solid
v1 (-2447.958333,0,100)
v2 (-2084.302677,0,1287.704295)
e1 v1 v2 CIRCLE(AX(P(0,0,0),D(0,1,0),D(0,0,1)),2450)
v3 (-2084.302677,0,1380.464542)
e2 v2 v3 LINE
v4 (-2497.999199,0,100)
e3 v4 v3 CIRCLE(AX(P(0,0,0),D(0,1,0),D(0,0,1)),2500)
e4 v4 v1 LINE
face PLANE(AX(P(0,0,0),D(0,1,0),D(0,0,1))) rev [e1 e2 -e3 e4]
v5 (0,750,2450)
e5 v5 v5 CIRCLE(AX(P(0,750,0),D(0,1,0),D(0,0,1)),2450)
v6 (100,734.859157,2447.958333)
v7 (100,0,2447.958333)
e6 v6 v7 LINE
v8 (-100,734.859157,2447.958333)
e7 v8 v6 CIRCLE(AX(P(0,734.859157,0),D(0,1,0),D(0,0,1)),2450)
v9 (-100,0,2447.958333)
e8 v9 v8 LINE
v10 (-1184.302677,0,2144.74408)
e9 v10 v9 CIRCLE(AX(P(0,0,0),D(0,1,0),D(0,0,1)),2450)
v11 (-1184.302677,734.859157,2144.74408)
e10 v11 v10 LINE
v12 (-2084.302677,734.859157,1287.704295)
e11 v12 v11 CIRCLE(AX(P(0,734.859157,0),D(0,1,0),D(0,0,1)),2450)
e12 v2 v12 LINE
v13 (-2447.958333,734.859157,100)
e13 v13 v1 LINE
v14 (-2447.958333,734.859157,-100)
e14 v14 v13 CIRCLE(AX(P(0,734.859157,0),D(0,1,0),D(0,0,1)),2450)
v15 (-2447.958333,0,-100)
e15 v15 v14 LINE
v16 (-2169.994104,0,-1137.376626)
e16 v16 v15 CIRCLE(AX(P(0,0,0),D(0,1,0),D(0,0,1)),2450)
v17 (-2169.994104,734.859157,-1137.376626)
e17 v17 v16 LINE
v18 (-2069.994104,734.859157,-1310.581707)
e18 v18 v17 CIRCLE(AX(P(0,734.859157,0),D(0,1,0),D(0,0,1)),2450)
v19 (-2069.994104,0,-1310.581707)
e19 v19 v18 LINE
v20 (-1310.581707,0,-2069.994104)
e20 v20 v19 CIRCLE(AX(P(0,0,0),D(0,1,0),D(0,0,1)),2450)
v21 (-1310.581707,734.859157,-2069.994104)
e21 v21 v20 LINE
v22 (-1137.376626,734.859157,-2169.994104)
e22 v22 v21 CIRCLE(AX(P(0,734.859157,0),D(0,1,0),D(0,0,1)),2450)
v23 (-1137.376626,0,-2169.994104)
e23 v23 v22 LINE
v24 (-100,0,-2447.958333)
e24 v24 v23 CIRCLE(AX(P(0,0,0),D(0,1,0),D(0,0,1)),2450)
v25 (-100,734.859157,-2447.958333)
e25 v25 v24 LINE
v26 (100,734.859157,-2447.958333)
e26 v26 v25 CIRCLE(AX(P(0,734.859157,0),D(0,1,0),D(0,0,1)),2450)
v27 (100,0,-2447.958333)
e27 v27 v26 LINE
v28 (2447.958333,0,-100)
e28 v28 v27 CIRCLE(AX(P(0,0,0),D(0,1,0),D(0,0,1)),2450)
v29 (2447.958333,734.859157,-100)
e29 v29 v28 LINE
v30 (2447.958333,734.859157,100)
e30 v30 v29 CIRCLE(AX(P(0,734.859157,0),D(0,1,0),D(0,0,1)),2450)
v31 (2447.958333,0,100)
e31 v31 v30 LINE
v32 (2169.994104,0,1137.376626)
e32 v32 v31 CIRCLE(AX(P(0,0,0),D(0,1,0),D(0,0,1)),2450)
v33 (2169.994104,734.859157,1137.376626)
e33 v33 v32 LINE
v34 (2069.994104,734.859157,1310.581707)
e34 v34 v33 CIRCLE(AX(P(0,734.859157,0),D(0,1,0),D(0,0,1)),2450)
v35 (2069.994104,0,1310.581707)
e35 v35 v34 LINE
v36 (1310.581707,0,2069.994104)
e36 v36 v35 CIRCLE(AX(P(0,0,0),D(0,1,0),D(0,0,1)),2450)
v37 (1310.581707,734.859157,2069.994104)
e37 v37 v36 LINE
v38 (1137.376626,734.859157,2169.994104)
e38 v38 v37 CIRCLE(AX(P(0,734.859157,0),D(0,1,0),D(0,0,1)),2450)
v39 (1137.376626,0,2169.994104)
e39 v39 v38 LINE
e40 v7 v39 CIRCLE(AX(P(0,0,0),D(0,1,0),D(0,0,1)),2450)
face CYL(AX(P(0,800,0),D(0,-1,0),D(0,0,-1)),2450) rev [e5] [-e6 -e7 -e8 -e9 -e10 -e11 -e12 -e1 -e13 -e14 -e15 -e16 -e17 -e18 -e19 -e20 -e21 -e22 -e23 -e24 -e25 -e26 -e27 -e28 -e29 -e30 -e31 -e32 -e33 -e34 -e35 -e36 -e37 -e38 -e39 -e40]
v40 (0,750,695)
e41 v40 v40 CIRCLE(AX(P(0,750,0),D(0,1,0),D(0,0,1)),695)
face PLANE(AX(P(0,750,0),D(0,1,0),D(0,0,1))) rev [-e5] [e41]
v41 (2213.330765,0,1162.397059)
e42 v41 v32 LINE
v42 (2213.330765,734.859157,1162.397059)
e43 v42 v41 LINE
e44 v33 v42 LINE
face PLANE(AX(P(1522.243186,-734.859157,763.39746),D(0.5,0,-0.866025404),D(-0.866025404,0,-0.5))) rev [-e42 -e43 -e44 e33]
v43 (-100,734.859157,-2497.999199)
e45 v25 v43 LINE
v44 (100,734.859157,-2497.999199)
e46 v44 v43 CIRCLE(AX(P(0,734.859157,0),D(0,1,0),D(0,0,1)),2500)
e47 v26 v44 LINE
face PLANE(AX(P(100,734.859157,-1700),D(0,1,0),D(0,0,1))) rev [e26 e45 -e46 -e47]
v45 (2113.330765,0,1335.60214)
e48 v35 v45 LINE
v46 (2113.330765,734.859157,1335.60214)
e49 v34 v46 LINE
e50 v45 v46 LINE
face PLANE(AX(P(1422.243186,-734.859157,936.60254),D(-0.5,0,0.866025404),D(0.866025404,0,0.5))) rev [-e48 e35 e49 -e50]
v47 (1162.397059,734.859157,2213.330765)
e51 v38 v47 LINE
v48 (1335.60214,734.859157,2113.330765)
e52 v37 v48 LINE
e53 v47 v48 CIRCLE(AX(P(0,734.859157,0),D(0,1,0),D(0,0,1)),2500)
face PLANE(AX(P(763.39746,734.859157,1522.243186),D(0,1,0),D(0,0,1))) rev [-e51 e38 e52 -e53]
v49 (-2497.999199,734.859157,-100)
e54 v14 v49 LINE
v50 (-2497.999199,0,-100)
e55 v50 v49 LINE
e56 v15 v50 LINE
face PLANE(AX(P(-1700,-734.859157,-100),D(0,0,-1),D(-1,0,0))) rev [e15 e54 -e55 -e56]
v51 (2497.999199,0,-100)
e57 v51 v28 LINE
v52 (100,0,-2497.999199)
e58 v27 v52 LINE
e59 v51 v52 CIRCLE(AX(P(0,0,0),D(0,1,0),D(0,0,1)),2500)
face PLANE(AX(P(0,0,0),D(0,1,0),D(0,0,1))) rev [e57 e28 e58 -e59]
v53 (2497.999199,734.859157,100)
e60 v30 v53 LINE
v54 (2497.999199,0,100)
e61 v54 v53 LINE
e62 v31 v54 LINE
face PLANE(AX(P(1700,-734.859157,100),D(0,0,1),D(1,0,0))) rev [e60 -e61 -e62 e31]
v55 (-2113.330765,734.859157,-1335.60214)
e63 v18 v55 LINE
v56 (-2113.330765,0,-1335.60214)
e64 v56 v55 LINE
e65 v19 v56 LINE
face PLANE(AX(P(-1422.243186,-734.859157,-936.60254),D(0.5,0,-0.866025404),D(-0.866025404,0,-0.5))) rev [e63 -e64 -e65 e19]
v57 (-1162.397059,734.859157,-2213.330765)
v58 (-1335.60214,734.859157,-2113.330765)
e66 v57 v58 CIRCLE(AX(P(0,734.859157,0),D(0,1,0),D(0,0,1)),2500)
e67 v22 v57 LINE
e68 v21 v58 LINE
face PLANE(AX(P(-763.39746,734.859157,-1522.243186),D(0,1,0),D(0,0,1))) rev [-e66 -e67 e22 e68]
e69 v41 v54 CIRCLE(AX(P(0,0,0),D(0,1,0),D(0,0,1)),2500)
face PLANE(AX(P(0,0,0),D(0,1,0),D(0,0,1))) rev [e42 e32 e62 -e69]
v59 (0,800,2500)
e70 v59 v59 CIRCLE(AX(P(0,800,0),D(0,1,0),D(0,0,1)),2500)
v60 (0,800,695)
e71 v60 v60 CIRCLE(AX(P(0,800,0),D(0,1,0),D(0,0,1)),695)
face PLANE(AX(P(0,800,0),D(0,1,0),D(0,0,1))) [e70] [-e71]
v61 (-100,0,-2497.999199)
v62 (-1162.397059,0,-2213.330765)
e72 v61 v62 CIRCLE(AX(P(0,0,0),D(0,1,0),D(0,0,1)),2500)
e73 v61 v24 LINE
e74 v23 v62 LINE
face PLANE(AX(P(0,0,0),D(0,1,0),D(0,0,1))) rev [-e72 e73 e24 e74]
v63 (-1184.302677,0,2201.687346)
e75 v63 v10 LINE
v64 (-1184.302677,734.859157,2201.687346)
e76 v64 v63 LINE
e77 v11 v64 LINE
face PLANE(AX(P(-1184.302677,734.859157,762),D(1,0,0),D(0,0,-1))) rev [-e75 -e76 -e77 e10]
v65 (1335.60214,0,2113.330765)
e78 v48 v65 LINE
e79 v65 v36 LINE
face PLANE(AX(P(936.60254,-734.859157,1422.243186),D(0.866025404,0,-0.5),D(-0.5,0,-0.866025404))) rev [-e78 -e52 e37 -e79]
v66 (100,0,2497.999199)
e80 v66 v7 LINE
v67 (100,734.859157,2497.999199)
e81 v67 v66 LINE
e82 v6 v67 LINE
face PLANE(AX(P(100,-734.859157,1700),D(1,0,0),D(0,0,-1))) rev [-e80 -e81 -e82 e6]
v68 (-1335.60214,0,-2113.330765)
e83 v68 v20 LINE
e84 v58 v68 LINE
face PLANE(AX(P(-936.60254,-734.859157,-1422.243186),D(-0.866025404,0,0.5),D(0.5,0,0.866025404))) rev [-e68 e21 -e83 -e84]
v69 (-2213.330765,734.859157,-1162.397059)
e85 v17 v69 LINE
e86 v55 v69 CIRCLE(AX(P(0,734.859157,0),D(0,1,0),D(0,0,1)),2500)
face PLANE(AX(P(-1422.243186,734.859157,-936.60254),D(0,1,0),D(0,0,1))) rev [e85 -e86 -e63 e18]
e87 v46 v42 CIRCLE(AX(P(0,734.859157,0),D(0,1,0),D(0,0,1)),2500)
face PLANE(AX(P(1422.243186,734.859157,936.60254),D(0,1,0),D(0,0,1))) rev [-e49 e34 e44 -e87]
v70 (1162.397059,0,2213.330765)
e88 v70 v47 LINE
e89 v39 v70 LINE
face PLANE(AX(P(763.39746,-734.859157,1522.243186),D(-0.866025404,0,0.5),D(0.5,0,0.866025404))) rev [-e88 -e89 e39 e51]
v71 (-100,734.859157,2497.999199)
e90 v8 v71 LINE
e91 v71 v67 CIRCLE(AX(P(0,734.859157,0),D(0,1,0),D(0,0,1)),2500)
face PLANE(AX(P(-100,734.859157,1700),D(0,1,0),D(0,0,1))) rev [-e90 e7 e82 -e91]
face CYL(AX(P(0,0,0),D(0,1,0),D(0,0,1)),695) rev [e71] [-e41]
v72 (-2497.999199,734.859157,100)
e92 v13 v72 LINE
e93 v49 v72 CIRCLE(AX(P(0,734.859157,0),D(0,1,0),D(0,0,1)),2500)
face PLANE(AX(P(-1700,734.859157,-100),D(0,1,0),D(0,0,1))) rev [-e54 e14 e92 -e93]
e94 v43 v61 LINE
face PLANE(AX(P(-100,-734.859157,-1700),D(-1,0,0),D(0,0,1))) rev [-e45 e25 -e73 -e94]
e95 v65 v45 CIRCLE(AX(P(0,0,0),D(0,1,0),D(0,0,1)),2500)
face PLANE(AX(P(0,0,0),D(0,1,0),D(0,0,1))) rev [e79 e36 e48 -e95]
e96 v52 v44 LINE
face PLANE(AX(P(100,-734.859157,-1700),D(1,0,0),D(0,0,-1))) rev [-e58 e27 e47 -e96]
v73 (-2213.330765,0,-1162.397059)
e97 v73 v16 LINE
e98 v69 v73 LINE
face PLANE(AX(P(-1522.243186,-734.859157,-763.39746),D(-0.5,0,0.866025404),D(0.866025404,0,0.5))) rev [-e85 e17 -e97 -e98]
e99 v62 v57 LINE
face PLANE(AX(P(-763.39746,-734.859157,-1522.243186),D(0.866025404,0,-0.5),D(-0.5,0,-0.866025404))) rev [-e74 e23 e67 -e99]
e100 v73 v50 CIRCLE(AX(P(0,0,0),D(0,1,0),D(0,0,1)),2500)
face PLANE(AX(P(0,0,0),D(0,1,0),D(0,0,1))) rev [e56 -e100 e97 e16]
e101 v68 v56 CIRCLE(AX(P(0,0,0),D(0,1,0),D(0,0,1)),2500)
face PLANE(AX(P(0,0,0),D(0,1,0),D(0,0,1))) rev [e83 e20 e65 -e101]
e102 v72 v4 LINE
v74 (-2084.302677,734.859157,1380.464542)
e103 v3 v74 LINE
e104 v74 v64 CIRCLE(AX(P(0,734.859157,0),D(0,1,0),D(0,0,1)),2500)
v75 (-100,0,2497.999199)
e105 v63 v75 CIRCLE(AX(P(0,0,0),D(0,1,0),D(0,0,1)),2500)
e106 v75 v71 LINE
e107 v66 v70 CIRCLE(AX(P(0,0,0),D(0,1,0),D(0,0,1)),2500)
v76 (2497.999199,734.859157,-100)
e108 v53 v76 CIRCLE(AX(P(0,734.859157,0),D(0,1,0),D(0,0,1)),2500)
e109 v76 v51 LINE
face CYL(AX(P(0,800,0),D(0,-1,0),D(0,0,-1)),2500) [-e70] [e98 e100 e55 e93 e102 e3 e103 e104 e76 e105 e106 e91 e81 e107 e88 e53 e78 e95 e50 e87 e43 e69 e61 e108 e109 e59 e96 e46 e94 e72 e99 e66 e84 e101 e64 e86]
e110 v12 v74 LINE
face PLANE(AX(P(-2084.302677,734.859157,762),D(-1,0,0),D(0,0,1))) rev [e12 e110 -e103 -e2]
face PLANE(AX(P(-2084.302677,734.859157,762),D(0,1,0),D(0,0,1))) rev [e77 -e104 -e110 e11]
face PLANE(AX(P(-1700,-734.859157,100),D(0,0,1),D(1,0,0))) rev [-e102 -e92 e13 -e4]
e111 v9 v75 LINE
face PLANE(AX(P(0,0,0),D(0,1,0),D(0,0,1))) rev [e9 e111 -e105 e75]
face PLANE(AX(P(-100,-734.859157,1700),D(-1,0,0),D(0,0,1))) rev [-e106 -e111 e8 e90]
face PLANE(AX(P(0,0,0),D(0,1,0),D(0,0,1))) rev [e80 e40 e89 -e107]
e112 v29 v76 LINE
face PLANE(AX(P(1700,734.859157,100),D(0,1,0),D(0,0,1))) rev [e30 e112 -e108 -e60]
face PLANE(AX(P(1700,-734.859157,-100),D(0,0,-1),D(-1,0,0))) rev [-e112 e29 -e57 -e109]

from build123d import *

# Parameters (mm, degrees)
SKETCH2_R           = 2500
BOSS_EXTRUDE1_DEPTH = 800
SHELL1_T            = -50
SKETCH3_R           = 695
CUT_EXTRUDE1_DEPTH  = 800
SKETCH9_W           = 200
SKETCH9_H           = 1469.718314702
CUT_EXTRUDE3_DEPTH  = 800
CIRPATTERN1_COUNT   = 4
CIRPATTERN1_ANGLE   = 90
CIRPATTERN2_DEPTH   = 734.859157351
SKETCH10_W          = 900
SKETCH10_H          = 1148.258495741
CUT_EXTRUDE4_DEPTH  = 1738


# Read off the part's stored shape, not the designer's step: CirPattern2
with BuildPart() as part:
    # Sketch2 → Boss-Extrude1 (new body)
    with BuildSketch(Plane(origin=(0, 0, 0), x_dir=(1, 0, 0), z_dir=(0, 1, 0))):
        with Locations(Location((0, 0, 0), (0, 0, 270))):
            Circle(SKETCH2_R)
    extrude(amount=BOSS_EXTRUDE1_DEPTH)

    # Shell1
    shell1_openings = [part.faces().sort_by_distance(p)[0] for p in [
        (0, 0, 0),
    ]]
    offset(amount=SHELL1_T, openings=shell1_openings, kind=Kind.INTERSECTION)

    # Sketch3 → Cut-Extrude1 (cut)
    with BuildSketch(Plane(origin=(0, 800, 0), x_dir=(1, 0, 0), z_dir=(0, 1, 0))):
        with Locations(Location((0, 0, 0), (0, 0, 270))):
            Circle(SKETCH3_R)
    extrude(amount=-CUT_EXTRUDE1_DEPTH, mode=Mode.SUBTRACT)

    # Sketch9 → Cut-Extrude3 (cut)
    with BuildSketch(Plane.XY.offset(2500)):
        Rectangle(SKETCH9_W, SKETCH9_H)
    cut_extrude3 = extrude(amount=-CUT_EXTRUDE3_DEPTH, mode=Mode.SUBTRACT)

    # CirPattern1: Cut-Extrude3 ×4 about axis
    cirpattern1_axis = Axis((0, 0, 0), (0, 1, 0))
    for i in range(1, CIRPATTERN1_COUNT):
        add(cut_extrude3.rotate(cirpattern1_axis, i * CIRPATTERN1_ANGLE / (CIRPATTERN1_COUNT - 1)), mode=Mode.SUBTRACT)

    # CirPattern2 outline → CirPattern2 (cut)
    with BuildSketch(Plane(origin=(0, 0, 0), x_dir=(1, 0, 0), z_dir=(0, 1, 0))):
        with BuildLine():
            ThreePointArc((-100, 2447.958332979), (0, 2450), (100, 2447.958332979))
            Line((100, 2447.958332979), (100, 2497.999199359))
            ThreePointArc((100, 2497.999199359), (0, 2500), (-100, 2497.999199359))
            Line((-100, 2497.999199359), (-100, 2447.958332979))
        make_face()
        with BuildLine():
            Line((-2497.999199359, -100), (-2447.958332979, -100))
            ThreePointArc((-2447.958332979, -100), (-2450, 0), (-2447.958332979, 100))
            Line((-2447.958332979, 100), (-2497.999199359, 100))
            ThreePointArc((-2497.999199359, 100), (-2500, 0), (-2497.999199359, -100))
        make_face()
        with BuildLine():
            ThreePointArc((-1310.581706868, 2069.994103765), (-1225, 2121.762239272), (-1137.376626111, 2169.994103765))
            Line((-1137.376626111, 2169.994103765), (-1162.397059301, 2213.330765278))
            ThreePointArc((-1162.397059301, 2213.330765278), (-1250, 2165.063509461), (-1335.602140058, 2113.330765278))
            Line((-1335.602140058, 2113.330765278), (-1310.581706868, 2069.994103765))
        make_face()
        with BuildLine():
            Line((-2213.330765278, 1162.397059301), (-2169.994103765, 1137.376626111))
            ThreePointArc((-2169.994103765, 1137.376626111), (-2121.762239272, 1225), (-2069.994103765, 1310.581706868))
            Line((-2069.994103765, 1310.581706868), (-2113.330765278, 1335.602140058))
            ThreePointArc((-2113.330765278, 1335.602140058), (-2165.063509461, 1250), (-2213.330765278, 1162.397059301))
        make_face()
    extrude(amount=CIRPATTERN2_DEPTH, mode=Mode.SUBTRACT)

    # Sketch10 → Cut-Extrude4 (cut)
    with BuildSketch(Plane.XY.offset(2500)):
        with Locations((-1634.302676631, 160.72990948)):
            Rectangle(SKETCH10_W, SKETCH10_H)
    extrude(amount=-CUT_EXTRUDE4_DEPTH, mode=Mode.SUBTRACT)


solid = part.part
